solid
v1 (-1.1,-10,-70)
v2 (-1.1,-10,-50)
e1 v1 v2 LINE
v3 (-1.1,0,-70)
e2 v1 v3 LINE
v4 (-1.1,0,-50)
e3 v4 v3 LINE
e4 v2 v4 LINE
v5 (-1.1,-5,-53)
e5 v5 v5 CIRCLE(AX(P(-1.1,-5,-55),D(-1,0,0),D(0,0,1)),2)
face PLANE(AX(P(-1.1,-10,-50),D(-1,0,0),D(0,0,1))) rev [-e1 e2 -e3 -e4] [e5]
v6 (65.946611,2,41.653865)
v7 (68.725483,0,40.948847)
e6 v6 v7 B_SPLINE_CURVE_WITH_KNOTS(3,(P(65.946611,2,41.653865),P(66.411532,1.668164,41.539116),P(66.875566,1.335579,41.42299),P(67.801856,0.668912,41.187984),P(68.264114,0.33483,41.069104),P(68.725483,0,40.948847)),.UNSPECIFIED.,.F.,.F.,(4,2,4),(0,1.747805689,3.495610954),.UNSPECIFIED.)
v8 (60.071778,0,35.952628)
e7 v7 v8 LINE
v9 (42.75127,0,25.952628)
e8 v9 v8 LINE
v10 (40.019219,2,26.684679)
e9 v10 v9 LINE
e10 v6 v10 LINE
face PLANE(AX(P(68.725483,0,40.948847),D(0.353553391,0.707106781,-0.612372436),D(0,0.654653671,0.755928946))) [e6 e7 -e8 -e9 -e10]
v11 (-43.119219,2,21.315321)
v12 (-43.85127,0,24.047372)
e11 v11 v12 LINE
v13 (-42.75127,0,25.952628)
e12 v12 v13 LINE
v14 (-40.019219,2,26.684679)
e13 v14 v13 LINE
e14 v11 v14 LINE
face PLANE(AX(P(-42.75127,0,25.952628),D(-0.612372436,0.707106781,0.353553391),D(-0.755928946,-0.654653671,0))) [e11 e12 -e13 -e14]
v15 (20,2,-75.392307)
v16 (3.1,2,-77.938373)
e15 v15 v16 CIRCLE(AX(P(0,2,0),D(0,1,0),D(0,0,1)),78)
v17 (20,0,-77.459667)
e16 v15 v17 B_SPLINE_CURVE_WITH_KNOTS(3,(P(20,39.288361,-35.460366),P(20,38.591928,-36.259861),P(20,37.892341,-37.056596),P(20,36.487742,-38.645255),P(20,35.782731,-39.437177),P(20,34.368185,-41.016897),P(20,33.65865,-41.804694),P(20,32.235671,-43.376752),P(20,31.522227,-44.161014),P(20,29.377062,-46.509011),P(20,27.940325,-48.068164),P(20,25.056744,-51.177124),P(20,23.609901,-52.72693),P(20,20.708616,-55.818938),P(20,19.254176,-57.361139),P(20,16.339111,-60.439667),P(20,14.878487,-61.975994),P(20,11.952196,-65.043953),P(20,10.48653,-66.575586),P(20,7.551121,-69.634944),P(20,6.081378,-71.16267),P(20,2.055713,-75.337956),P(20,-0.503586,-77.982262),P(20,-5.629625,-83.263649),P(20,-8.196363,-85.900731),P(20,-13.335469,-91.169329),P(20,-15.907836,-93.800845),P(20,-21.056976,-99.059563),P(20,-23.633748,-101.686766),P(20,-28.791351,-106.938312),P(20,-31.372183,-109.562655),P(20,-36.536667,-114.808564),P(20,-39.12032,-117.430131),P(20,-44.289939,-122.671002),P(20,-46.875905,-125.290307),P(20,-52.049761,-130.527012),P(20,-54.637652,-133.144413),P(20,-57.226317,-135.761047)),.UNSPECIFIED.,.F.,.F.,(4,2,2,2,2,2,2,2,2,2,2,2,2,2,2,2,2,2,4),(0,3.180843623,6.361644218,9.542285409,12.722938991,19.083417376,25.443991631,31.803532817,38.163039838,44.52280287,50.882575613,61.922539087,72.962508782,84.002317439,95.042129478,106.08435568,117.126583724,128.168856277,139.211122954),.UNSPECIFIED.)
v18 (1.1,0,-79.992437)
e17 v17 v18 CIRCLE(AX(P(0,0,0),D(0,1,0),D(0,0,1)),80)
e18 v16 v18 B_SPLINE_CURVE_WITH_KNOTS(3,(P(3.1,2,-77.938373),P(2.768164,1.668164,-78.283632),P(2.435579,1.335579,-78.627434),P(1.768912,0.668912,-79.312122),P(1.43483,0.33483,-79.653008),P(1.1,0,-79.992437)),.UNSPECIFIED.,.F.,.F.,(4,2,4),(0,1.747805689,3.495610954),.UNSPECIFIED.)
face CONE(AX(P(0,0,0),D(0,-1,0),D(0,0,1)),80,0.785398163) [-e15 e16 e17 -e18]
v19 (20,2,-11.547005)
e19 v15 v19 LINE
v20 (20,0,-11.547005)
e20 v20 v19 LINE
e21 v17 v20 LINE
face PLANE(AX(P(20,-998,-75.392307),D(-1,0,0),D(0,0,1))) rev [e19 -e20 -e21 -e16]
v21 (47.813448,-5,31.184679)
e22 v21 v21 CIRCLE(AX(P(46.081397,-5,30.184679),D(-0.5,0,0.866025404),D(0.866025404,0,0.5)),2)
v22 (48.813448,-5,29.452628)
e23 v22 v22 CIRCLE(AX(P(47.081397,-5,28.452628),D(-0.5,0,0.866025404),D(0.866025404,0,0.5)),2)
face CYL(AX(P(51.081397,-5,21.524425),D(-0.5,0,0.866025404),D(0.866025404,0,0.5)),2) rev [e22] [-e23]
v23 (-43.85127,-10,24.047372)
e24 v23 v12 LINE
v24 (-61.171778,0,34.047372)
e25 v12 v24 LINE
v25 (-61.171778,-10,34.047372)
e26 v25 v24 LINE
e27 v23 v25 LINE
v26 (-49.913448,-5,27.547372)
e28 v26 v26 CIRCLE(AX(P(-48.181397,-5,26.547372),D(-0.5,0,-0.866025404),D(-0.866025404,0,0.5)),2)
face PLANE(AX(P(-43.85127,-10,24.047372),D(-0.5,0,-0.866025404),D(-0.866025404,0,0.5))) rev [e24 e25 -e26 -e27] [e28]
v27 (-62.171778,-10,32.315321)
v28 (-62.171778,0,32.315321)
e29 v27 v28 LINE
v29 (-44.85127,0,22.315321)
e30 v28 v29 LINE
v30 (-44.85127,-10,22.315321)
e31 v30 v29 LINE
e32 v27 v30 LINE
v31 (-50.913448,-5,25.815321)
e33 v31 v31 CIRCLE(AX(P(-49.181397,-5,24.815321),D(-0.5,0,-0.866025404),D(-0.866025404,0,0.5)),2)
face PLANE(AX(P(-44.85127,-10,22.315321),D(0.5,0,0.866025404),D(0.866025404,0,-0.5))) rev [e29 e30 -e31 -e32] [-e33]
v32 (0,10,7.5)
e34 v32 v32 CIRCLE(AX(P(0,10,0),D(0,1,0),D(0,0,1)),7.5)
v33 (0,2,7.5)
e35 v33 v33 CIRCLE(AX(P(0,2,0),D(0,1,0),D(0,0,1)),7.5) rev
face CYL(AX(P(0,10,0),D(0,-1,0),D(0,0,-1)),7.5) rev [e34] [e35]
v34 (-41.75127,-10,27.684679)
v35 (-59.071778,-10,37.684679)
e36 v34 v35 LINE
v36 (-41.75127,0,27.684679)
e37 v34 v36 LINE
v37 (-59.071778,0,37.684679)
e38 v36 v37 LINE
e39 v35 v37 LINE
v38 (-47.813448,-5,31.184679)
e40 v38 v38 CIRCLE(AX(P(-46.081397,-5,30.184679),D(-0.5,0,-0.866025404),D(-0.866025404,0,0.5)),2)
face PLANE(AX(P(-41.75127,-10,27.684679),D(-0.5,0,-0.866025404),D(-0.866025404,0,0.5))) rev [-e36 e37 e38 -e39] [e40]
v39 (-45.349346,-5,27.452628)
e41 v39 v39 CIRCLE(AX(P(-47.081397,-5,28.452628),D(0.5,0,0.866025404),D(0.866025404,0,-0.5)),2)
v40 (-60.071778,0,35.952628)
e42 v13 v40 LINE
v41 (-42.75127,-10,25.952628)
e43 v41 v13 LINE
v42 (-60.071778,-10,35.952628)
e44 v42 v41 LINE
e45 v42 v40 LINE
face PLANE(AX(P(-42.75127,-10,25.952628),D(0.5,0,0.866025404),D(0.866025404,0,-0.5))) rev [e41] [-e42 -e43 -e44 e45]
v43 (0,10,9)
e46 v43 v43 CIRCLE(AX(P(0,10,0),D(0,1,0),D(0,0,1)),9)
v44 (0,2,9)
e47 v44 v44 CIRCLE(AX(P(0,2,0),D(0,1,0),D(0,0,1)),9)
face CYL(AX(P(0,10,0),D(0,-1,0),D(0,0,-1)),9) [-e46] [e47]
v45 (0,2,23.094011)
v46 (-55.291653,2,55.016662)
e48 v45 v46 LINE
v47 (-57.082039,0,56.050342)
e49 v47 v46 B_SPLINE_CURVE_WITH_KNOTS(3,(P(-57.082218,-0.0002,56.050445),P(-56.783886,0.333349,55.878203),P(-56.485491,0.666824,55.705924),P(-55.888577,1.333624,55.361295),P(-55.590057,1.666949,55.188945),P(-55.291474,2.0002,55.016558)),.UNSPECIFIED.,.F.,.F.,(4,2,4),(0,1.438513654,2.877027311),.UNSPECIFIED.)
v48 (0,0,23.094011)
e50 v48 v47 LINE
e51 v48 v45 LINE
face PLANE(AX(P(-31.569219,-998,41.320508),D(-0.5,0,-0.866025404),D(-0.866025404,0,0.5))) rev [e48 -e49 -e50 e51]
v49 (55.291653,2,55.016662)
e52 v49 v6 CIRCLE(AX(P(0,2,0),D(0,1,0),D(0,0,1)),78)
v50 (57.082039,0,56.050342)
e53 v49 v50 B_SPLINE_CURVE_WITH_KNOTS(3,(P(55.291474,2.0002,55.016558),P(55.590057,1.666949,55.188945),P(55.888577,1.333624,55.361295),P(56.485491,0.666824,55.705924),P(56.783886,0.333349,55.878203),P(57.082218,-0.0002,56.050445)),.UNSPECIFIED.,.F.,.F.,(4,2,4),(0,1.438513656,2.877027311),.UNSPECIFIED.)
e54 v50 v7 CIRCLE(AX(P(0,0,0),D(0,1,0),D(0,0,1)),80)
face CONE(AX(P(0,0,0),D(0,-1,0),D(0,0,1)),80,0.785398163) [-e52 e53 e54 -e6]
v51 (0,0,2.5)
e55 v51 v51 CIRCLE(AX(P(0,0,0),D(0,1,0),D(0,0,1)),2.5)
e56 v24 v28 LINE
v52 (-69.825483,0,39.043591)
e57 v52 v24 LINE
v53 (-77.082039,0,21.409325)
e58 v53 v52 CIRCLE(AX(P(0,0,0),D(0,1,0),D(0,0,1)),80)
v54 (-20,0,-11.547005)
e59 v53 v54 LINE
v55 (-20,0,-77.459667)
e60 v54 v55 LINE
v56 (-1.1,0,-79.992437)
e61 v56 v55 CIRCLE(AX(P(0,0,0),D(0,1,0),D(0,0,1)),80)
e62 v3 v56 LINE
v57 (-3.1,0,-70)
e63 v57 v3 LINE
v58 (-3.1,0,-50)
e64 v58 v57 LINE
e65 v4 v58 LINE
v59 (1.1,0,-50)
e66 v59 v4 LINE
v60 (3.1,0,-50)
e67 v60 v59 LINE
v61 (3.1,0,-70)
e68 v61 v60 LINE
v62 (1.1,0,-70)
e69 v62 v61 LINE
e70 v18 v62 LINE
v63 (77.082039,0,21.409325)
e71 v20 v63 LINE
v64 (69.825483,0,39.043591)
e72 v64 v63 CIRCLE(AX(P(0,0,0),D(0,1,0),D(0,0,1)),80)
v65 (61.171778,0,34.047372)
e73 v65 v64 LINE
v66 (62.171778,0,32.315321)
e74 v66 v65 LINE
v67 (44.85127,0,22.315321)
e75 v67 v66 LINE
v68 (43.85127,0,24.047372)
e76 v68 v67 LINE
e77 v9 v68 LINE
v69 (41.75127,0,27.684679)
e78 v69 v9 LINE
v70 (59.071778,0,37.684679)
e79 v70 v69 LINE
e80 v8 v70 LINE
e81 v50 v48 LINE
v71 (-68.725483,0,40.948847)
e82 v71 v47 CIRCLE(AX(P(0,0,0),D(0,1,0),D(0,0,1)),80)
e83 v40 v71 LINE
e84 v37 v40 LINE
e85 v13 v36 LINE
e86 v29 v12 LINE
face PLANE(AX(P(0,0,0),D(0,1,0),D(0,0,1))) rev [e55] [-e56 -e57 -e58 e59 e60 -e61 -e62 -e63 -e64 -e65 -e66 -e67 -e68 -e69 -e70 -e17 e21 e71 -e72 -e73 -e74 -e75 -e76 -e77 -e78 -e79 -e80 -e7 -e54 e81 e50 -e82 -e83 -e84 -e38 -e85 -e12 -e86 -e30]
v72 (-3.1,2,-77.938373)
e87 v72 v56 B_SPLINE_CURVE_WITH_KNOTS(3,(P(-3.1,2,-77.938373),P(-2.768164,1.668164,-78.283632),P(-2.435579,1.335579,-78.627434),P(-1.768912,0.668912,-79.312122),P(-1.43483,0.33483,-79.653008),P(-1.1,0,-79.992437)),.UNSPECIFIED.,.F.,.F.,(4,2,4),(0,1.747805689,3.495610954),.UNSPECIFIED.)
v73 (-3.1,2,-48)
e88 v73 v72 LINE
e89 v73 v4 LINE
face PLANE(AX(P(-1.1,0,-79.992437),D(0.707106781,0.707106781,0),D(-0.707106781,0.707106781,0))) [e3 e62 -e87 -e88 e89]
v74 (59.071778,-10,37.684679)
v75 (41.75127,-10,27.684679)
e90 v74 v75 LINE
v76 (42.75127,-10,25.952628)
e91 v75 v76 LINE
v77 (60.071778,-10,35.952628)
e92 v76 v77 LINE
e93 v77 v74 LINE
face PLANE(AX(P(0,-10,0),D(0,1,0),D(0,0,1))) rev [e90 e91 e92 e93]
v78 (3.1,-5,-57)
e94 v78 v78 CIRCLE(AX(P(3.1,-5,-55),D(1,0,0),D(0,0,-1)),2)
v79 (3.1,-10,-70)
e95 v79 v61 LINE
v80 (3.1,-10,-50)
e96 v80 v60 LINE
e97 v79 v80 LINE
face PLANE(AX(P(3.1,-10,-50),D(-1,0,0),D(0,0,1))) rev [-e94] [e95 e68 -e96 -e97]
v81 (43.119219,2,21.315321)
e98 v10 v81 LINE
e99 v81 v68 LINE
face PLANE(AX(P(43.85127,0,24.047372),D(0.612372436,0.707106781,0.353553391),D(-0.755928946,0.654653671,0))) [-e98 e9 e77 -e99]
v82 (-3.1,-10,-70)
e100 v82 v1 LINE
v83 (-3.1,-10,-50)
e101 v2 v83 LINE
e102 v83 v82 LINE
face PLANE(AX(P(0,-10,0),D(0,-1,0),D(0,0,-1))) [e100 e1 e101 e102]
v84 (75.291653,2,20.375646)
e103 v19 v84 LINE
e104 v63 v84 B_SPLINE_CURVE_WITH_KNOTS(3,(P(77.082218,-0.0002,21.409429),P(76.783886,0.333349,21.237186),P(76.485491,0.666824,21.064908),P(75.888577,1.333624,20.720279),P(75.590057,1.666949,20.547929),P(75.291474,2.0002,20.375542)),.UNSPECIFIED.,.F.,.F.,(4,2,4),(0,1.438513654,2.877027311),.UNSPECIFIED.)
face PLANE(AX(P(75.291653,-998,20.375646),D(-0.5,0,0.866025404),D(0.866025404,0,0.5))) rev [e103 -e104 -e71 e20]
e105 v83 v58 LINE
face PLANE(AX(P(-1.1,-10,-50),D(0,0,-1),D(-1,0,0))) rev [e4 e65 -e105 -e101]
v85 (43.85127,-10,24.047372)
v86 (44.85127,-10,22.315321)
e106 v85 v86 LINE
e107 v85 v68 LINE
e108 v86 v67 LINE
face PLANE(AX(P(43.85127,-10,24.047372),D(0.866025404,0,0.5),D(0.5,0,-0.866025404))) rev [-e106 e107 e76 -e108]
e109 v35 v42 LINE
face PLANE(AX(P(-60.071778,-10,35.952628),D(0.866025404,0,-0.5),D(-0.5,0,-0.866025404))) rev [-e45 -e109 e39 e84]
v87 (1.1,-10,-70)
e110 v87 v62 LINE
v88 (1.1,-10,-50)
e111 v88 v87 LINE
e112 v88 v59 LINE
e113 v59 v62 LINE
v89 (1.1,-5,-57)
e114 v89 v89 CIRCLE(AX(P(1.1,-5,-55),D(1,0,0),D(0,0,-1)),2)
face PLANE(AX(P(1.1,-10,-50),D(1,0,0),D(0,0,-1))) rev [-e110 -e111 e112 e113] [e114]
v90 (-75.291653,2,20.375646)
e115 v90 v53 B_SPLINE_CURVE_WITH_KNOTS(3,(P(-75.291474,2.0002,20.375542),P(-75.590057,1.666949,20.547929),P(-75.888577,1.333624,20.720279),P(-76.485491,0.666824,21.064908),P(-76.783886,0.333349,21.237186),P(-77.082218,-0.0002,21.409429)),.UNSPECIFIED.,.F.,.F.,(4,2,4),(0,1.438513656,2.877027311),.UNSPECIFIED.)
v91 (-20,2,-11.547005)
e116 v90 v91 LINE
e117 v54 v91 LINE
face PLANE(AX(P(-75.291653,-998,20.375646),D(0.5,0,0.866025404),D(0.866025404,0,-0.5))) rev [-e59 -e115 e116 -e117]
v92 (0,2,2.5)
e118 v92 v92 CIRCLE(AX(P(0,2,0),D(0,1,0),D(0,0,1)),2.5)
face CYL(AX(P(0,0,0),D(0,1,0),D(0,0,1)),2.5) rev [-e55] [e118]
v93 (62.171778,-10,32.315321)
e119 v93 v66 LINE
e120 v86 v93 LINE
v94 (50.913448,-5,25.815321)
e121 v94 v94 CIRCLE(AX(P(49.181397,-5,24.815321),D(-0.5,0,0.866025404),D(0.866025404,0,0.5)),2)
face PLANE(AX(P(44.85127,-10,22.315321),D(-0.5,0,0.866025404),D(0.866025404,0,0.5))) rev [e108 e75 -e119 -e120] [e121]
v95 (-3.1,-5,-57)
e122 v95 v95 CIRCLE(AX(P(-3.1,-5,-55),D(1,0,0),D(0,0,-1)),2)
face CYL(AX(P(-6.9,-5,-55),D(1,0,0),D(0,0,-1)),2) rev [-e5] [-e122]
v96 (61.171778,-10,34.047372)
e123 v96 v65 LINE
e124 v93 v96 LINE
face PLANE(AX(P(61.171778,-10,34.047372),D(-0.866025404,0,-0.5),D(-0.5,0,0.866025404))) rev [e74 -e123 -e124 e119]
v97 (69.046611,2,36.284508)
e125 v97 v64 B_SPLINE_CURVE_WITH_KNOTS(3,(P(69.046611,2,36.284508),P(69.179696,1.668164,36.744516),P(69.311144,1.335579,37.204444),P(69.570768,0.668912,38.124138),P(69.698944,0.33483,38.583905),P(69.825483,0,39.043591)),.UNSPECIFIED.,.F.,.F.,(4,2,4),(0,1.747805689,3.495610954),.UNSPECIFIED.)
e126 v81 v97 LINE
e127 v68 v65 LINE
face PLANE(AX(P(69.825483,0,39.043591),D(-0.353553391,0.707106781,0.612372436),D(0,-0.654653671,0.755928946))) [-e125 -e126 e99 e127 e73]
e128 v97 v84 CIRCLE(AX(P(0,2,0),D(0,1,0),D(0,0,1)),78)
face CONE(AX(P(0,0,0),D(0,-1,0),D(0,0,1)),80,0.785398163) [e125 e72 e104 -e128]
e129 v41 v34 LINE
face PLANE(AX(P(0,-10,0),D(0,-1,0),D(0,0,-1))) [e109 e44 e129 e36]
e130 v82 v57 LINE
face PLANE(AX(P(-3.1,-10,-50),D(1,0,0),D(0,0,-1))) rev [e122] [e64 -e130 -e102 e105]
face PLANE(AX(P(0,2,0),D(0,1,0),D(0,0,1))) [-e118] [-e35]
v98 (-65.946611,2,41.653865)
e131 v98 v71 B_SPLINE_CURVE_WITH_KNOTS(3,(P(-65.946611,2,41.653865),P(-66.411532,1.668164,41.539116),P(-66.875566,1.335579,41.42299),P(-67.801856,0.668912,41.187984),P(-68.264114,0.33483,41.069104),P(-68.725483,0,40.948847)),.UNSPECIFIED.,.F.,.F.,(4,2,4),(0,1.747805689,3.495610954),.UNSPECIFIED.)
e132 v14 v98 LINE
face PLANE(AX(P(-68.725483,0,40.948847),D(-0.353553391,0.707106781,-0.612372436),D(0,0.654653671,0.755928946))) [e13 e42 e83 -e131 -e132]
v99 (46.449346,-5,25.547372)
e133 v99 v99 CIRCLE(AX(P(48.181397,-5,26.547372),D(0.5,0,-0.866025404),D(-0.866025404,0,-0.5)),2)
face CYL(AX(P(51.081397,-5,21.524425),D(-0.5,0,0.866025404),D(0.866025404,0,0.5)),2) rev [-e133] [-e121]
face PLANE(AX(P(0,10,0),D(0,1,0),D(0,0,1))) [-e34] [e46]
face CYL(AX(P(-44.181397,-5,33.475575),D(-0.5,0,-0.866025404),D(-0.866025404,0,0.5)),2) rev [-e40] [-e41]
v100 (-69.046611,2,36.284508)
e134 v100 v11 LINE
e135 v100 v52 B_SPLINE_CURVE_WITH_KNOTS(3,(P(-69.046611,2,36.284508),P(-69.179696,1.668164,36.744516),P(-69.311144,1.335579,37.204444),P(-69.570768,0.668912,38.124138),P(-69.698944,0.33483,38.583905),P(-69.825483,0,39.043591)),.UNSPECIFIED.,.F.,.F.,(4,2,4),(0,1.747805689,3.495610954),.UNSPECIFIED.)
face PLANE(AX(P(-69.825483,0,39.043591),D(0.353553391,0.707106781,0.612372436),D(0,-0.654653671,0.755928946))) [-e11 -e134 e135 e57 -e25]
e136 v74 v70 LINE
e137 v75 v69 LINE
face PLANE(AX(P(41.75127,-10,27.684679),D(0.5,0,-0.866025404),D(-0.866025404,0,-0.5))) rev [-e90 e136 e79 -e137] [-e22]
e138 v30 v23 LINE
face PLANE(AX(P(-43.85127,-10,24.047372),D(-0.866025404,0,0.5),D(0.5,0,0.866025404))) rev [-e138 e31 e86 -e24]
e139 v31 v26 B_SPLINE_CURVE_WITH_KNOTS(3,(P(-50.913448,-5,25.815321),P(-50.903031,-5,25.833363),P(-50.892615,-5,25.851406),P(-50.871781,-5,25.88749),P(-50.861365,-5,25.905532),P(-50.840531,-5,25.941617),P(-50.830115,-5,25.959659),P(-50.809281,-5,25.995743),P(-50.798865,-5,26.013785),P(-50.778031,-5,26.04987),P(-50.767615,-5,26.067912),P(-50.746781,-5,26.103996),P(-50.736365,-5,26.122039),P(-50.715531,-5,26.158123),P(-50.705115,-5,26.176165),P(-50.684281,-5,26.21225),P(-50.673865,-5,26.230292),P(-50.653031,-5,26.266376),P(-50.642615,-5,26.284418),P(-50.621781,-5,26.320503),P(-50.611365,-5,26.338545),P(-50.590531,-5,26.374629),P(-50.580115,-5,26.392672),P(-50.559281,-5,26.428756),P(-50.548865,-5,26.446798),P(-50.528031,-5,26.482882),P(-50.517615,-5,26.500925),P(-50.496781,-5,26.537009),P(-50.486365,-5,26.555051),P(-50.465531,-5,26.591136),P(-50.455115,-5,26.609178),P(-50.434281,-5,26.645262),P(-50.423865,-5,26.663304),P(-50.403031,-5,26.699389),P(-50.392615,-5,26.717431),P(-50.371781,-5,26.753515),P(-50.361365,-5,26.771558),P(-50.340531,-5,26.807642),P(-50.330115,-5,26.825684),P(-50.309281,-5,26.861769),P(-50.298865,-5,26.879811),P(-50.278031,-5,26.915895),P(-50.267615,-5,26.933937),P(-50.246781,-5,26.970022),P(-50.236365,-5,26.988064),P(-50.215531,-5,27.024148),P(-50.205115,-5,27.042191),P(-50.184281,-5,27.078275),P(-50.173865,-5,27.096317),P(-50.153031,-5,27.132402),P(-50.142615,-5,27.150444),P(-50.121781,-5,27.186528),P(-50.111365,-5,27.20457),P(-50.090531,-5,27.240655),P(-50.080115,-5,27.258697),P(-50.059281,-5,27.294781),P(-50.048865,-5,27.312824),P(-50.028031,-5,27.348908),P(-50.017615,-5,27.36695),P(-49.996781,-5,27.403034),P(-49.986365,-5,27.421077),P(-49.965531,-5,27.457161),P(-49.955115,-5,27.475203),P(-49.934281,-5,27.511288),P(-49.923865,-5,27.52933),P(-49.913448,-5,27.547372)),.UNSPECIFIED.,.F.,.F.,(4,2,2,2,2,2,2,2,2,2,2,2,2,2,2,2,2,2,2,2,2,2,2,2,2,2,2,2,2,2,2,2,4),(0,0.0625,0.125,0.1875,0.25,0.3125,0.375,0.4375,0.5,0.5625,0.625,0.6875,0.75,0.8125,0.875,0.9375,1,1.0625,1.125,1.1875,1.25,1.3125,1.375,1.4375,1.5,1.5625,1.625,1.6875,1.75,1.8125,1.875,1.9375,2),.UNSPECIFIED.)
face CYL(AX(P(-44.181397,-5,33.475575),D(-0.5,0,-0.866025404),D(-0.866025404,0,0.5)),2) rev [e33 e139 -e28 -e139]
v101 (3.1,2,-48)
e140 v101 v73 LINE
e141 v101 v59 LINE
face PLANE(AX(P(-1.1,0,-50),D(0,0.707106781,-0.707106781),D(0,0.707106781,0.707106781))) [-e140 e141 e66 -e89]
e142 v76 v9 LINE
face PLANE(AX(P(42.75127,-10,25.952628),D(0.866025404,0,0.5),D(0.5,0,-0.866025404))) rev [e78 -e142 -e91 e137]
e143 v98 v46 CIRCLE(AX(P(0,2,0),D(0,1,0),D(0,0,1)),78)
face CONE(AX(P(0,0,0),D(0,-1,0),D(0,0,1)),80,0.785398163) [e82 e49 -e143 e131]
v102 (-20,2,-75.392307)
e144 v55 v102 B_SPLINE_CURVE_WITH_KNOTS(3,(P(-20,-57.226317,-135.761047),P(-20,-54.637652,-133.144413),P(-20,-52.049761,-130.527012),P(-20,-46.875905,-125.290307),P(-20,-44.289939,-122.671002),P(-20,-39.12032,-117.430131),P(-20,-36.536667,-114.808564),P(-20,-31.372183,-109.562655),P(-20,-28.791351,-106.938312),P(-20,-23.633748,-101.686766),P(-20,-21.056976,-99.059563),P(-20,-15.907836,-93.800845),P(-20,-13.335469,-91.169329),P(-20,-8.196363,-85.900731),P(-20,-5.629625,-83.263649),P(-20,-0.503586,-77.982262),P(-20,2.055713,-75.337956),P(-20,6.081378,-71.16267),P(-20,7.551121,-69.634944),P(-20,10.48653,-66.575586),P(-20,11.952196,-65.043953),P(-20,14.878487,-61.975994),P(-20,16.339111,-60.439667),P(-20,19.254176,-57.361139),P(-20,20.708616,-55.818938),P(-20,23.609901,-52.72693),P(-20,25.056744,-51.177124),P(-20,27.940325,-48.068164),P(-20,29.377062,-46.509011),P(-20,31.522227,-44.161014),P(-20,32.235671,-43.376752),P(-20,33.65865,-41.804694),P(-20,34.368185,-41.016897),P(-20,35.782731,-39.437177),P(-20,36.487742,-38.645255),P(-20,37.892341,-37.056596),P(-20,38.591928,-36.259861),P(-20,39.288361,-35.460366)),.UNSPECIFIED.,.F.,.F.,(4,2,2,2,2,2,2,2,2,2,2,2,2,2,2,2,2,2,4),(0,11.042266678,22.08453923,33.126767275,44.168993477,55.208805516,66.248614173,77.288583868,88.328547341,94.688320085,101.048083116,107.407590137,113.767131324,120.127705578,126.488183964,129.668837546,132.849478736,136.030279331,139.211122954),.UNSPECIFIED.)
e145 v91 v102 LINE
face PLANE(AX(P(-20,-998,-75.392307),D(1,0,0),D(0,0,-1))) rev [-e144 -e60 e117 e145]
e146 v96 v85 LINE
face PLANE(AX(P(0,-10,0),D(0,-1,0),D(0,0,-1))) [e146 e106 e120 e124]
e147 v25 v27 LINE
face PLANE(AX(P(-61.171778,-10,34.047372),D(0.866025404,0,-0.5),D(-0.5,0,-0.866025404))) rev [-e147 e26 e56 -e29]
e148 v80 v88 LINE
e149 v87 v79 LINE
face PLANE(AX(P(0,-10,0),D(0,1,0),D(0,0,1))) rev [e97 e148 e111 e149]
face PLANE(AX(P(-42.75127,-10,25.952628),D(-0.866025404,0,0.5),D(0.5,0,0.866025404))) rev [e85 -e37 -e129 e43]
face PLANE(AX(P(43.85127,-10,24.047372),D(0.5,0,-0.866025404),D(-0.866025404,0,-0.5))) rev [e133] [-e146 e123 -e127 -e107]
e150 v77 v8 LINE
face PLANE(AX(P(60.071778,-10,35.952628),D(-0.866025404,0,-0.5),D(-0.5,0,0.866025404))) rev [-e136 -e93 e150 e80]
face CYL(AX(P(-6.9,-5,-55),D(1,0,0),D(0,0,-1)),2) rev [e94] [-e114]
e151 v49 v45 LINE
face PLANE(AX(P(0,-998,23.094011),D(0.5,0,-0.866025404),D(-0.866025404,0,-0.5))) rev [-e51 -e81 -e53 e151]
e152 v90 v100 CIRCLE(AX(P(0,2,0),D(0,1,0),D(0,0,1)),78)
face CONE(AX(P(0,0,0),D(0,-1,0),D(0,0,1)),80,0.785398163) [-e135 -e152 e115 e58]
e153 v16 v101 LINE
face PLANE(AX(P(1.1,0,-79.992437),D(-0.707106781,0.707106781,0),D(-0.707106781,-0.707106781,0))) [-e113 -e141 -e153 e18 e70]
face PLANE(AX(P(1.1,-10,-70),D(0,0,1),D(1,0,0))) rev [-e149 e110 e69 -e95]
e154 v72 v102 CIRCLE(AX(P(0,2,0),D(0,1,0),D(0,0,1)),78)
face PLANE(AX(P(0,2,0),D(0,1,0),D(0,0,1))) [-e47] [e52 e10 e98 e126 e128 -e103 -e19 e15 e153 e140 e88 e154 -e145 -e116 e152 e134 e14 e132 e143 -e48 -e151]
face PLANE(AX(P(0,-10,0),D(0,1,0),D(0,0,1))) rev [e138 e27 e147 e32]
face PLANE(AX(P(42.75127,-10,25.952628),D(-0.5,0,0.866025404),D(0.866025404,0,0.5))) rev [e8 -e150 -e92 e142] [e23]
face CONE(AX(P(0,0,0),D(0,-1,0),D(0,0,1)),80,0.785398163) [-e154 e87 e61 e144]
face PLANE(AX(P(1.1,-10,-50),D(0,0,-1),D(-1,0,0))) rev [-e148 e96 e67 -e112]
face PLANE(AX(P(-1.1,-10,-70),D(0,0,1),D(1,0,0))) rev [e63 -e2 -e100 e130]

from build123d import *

# Parameters (mm, degrees)
BOSS_EXTRUDE1_DEPTH = 2
BOSS_EXTRUDE1_DRAFT = 45
SKETCH2_R           = 2.5
CUT_EXTRUDE1_DEPTH  = 114.154761278
SKETCH3_R           = 9
SKETCH3_R_2         = 7.5
BOSS_EXTRUDE2_DEPTH = 8
SKETCH4_W           = 2
SKETCH4_H           = 20
BOSS_EXTRUDE3_DEPTH = 10
SKETCH5_R           = 2
CUT_EXTRUDE2_DEPTH  = 10
CIRPATTERN1_COUNT   = 3
CUT_EXTRUDE3_DEPTH  = 1000


# Read off the part's stored shape, not the designer's step: Boss-Extrude1
with BuildPart() as part:
    # Boss-Extrude1 outline → Boss-Extrude1 (with draft: the straight prism first)
    with BuildSketch(Plane(origin=(0, 2, 0), x_dir=(1, 0, 0), z_dir=(0, 1, 0))):
        with BuildLine():
            ThreePointArc((-3.1, 77.938373091), (-67.549981495, 39), (-69.046611026, -36.284507794))
            Line((-69.046611026, -36.284507794), (-43.119219382, -21.315321248))
            Line((-43.119219382, -21.315321248), (-40.019219382, -26.684678752))
            Line((-40.019219382, -26.684678752), (-65.946611026, -41.653865297))
            ThreePointArc((-65.946611026, -41.653865297), (0, -78), (65.946611026, -41.653865297))
            Line((65.946611026, -41.653865297), (40.019219382, -26.684678752))
            Line((40.019219382, -26.684678752), (43.119219382, -21.315321248))
            Line((43.119219382, -21.315321248), (69.046611026, -36.284507794))
            ThreePointArc((69.046611026, -36.284507794), (67.549981495, 39), (3.1, 77.938373091))
            Line((3.1, 77.938373091), (3.1, 48))
            Line((3.1, 48), (-3.1, 48))
            Line((-3.1, 48), (-3.1, 77.938373091))
        make_face()
    extrude(amount=-BOSS_EXTRUDE1_DEPTH)
    # Boss-Extrude1: the draft: its side faces are tilted about the plane it starts from
    boss_extrude1_sides = [part.faces().sort_by_distance(p)[0] for p in [
        (67.549981495, 1, -39),
        (3.1, 1, -62.969186546),
        (0, 1, -48),
        (-3.1, 1, -62.969186546),
        (-67.549981495, 1, -39),
        (-56.082915204, 1, 28.799914521),
        (-41.569219382, 1, 24),
        (-52.982915204, 1, 34.169272025),
        (0, 1, 78),
        (52.982915204, 1, 34.169272025),
        (41.569219382, 1, 24),
        (56.082915204, 1, 28.799914521),
    ]]
    draft(boss_extrude1_sides, Plane(origin=(0, 2, 0), x_dir=(1, 0, 0), z_dir=(0, 1, 0)), BOSS_EXTRUDE1_DRAFT)

    # Sketch2 → Cut-Extrude1 (cut, through all)
    with BuildSketch(Plane(origin=(0, 2, 0), x_dir=(1, 0, 0), z_dir=(0, 1, 0))):
        with Locations(Location((0, 0, 0), (0, 0, 270))):
            Circle(SKETCH2_R)
    extrude(amount=-CUT_EXTRUDE1_DEPTH, mode=Mode.SUBTRACT)

    # Sketch3 → Boss-Extrude2 (add)
    with BuildSketch(Plane(origin=(0, 2, 0), x_dir=(1, 0, 0), z_dir=(0, 1, 0))):
        with Locations(Location((0, 0, 0), (0, 0, 270))):
            Circle(SKETCH3_R)
        with Locations(Location((0, 0, 0), (0, 0, 270))):
            Circle(SKETCH3_R_2, mode=Mode.SUBTRACT)
    extrude(amount=BOSS_EXTRUDE2_DEPTH)

    # Sketch4 → Boss-Extrude3 (add)
    with BuildSketch(Plane.XZ):
        Polygon((42.751270189, 25.952627944), (60.071778265, 35.952627944), (59.071778265, 37.684678752), (41.751270189, 27.684678752), align=None)
        Polygon((43.851270189, 24.047372056), (61.171778265, 34.047372056), (62.171778265, 32.315321248), (44.851270189, 22.315321248), align=None)
        with Locations((2.1, -60)):
            Rectangle(SKETCH4_W, SKETCH4_H)
        with Locations((-2.1, -60)):
            Rectangle(SKETCH4_W, SKETCH4_H)
        Polygon((-44.851270189, 22.315321248), (-62.171778265, 32.315321248), (-61.171778265, 34.047372056), (-43.851270189, 24.047372056), align=None)
        Polygon((-42.751270189, 25.952627944), (-60.071778265, 35.952627944), (-59.071778265, 37.684678752), (-41.751270189, 27.684678752), align=None)
    extrude(amount=BOSS_EXTRUDE3_DEPTH)

    # Sketch5 → Cut-Extrude2 (cut)
    with BuildSketch(Plane(origin=(3.1, 0, 0), x_dir=(0, 0, -1), z_dir=(1, 0, 0))):
        with Locations((55, -5)):
            Circle(SKETCH5_R)
    cut_extrude2 = extrude(amount=-CUT_EXTRUDE2_DEPTH, mode=Mode.SUBTRACT)

    # CirPattern1: Cut-Extrude2 ×3 about axis
    cirpattern1_axis = Axis((0, 10, 0), (0, -1, 0))
    for i in range(1, CIRPATTERN1_COUNT):
        add(cut_extrude2.rotate(cirpattern1_axis, i * 360 / CIRPATTERN1_COUNT), mode=Mode.SUBTRACT)

    # Sketch6 → Cut-Extrude3 (cut)
    with BuildSketch(Plane(origin=(0, 2, 0), x_dir=(1, 0, 0), z_dir=(0, 1, 0))):
        with BuildLine():
            Line((20, 75.3923073), (20, 77.459666924))
            ThreePointArc((20, 77.459666924), (69.282032303, 40), (77.082039325, -21.409325386))
            Line((77.082039325, -21.409325386), (75.291653372, -20.375645574))
            Line((75.291653372, -20.375645574), (20, 11.547005384))
            Line((20, 11.547005384), (20, 75.3923073))
        make_face()
        with BuildLine():
            Line((-31.569219382, -41.320508076), (0, -23.094010768))
            Line((0, -23.094010768), (31.569219382, -41.320508076))
            Line((31.569219382, -41.320508076), (55.291653372, -55.016661726))
            Line((55.291653372, -55.016661726), (57.082039325, -56.050341538))
            ThreePointArc((57.082039325, -56.050341538), (0, -80), (-57.082039325, -56.050341538))
            Line((-57.082039325, -56.050341538), (-55.291653372, -55.016661726))
            Line((-55.291653372, -55.016661726), (-31.569219382, -41.320508076))
        make_face()
        with BuildLine():
            Line((-51.569219382, -6.679491924), (-20, 11.547005384))
            Line((-20, 11.547005384), (-20, 75.3923073))
            Line((-20, 75.3923073), (-20, 77.459666924))
            ThreePointArc((-20, 77.459666924), (-69.282032303, 40), (-77.082039325, -21.409325386))
            Line((-77.082039325, -21.409325386), (-75.291653372, -20.375645574))
            Line((-75.291653372, -20.375645574), (-51.569219382, -6.679491924))
        make_face()
    extrude(amount=-CUT_EXTRUDE3_DEPTH, mode=Mode.SUBTRACT)


solid = part.part
